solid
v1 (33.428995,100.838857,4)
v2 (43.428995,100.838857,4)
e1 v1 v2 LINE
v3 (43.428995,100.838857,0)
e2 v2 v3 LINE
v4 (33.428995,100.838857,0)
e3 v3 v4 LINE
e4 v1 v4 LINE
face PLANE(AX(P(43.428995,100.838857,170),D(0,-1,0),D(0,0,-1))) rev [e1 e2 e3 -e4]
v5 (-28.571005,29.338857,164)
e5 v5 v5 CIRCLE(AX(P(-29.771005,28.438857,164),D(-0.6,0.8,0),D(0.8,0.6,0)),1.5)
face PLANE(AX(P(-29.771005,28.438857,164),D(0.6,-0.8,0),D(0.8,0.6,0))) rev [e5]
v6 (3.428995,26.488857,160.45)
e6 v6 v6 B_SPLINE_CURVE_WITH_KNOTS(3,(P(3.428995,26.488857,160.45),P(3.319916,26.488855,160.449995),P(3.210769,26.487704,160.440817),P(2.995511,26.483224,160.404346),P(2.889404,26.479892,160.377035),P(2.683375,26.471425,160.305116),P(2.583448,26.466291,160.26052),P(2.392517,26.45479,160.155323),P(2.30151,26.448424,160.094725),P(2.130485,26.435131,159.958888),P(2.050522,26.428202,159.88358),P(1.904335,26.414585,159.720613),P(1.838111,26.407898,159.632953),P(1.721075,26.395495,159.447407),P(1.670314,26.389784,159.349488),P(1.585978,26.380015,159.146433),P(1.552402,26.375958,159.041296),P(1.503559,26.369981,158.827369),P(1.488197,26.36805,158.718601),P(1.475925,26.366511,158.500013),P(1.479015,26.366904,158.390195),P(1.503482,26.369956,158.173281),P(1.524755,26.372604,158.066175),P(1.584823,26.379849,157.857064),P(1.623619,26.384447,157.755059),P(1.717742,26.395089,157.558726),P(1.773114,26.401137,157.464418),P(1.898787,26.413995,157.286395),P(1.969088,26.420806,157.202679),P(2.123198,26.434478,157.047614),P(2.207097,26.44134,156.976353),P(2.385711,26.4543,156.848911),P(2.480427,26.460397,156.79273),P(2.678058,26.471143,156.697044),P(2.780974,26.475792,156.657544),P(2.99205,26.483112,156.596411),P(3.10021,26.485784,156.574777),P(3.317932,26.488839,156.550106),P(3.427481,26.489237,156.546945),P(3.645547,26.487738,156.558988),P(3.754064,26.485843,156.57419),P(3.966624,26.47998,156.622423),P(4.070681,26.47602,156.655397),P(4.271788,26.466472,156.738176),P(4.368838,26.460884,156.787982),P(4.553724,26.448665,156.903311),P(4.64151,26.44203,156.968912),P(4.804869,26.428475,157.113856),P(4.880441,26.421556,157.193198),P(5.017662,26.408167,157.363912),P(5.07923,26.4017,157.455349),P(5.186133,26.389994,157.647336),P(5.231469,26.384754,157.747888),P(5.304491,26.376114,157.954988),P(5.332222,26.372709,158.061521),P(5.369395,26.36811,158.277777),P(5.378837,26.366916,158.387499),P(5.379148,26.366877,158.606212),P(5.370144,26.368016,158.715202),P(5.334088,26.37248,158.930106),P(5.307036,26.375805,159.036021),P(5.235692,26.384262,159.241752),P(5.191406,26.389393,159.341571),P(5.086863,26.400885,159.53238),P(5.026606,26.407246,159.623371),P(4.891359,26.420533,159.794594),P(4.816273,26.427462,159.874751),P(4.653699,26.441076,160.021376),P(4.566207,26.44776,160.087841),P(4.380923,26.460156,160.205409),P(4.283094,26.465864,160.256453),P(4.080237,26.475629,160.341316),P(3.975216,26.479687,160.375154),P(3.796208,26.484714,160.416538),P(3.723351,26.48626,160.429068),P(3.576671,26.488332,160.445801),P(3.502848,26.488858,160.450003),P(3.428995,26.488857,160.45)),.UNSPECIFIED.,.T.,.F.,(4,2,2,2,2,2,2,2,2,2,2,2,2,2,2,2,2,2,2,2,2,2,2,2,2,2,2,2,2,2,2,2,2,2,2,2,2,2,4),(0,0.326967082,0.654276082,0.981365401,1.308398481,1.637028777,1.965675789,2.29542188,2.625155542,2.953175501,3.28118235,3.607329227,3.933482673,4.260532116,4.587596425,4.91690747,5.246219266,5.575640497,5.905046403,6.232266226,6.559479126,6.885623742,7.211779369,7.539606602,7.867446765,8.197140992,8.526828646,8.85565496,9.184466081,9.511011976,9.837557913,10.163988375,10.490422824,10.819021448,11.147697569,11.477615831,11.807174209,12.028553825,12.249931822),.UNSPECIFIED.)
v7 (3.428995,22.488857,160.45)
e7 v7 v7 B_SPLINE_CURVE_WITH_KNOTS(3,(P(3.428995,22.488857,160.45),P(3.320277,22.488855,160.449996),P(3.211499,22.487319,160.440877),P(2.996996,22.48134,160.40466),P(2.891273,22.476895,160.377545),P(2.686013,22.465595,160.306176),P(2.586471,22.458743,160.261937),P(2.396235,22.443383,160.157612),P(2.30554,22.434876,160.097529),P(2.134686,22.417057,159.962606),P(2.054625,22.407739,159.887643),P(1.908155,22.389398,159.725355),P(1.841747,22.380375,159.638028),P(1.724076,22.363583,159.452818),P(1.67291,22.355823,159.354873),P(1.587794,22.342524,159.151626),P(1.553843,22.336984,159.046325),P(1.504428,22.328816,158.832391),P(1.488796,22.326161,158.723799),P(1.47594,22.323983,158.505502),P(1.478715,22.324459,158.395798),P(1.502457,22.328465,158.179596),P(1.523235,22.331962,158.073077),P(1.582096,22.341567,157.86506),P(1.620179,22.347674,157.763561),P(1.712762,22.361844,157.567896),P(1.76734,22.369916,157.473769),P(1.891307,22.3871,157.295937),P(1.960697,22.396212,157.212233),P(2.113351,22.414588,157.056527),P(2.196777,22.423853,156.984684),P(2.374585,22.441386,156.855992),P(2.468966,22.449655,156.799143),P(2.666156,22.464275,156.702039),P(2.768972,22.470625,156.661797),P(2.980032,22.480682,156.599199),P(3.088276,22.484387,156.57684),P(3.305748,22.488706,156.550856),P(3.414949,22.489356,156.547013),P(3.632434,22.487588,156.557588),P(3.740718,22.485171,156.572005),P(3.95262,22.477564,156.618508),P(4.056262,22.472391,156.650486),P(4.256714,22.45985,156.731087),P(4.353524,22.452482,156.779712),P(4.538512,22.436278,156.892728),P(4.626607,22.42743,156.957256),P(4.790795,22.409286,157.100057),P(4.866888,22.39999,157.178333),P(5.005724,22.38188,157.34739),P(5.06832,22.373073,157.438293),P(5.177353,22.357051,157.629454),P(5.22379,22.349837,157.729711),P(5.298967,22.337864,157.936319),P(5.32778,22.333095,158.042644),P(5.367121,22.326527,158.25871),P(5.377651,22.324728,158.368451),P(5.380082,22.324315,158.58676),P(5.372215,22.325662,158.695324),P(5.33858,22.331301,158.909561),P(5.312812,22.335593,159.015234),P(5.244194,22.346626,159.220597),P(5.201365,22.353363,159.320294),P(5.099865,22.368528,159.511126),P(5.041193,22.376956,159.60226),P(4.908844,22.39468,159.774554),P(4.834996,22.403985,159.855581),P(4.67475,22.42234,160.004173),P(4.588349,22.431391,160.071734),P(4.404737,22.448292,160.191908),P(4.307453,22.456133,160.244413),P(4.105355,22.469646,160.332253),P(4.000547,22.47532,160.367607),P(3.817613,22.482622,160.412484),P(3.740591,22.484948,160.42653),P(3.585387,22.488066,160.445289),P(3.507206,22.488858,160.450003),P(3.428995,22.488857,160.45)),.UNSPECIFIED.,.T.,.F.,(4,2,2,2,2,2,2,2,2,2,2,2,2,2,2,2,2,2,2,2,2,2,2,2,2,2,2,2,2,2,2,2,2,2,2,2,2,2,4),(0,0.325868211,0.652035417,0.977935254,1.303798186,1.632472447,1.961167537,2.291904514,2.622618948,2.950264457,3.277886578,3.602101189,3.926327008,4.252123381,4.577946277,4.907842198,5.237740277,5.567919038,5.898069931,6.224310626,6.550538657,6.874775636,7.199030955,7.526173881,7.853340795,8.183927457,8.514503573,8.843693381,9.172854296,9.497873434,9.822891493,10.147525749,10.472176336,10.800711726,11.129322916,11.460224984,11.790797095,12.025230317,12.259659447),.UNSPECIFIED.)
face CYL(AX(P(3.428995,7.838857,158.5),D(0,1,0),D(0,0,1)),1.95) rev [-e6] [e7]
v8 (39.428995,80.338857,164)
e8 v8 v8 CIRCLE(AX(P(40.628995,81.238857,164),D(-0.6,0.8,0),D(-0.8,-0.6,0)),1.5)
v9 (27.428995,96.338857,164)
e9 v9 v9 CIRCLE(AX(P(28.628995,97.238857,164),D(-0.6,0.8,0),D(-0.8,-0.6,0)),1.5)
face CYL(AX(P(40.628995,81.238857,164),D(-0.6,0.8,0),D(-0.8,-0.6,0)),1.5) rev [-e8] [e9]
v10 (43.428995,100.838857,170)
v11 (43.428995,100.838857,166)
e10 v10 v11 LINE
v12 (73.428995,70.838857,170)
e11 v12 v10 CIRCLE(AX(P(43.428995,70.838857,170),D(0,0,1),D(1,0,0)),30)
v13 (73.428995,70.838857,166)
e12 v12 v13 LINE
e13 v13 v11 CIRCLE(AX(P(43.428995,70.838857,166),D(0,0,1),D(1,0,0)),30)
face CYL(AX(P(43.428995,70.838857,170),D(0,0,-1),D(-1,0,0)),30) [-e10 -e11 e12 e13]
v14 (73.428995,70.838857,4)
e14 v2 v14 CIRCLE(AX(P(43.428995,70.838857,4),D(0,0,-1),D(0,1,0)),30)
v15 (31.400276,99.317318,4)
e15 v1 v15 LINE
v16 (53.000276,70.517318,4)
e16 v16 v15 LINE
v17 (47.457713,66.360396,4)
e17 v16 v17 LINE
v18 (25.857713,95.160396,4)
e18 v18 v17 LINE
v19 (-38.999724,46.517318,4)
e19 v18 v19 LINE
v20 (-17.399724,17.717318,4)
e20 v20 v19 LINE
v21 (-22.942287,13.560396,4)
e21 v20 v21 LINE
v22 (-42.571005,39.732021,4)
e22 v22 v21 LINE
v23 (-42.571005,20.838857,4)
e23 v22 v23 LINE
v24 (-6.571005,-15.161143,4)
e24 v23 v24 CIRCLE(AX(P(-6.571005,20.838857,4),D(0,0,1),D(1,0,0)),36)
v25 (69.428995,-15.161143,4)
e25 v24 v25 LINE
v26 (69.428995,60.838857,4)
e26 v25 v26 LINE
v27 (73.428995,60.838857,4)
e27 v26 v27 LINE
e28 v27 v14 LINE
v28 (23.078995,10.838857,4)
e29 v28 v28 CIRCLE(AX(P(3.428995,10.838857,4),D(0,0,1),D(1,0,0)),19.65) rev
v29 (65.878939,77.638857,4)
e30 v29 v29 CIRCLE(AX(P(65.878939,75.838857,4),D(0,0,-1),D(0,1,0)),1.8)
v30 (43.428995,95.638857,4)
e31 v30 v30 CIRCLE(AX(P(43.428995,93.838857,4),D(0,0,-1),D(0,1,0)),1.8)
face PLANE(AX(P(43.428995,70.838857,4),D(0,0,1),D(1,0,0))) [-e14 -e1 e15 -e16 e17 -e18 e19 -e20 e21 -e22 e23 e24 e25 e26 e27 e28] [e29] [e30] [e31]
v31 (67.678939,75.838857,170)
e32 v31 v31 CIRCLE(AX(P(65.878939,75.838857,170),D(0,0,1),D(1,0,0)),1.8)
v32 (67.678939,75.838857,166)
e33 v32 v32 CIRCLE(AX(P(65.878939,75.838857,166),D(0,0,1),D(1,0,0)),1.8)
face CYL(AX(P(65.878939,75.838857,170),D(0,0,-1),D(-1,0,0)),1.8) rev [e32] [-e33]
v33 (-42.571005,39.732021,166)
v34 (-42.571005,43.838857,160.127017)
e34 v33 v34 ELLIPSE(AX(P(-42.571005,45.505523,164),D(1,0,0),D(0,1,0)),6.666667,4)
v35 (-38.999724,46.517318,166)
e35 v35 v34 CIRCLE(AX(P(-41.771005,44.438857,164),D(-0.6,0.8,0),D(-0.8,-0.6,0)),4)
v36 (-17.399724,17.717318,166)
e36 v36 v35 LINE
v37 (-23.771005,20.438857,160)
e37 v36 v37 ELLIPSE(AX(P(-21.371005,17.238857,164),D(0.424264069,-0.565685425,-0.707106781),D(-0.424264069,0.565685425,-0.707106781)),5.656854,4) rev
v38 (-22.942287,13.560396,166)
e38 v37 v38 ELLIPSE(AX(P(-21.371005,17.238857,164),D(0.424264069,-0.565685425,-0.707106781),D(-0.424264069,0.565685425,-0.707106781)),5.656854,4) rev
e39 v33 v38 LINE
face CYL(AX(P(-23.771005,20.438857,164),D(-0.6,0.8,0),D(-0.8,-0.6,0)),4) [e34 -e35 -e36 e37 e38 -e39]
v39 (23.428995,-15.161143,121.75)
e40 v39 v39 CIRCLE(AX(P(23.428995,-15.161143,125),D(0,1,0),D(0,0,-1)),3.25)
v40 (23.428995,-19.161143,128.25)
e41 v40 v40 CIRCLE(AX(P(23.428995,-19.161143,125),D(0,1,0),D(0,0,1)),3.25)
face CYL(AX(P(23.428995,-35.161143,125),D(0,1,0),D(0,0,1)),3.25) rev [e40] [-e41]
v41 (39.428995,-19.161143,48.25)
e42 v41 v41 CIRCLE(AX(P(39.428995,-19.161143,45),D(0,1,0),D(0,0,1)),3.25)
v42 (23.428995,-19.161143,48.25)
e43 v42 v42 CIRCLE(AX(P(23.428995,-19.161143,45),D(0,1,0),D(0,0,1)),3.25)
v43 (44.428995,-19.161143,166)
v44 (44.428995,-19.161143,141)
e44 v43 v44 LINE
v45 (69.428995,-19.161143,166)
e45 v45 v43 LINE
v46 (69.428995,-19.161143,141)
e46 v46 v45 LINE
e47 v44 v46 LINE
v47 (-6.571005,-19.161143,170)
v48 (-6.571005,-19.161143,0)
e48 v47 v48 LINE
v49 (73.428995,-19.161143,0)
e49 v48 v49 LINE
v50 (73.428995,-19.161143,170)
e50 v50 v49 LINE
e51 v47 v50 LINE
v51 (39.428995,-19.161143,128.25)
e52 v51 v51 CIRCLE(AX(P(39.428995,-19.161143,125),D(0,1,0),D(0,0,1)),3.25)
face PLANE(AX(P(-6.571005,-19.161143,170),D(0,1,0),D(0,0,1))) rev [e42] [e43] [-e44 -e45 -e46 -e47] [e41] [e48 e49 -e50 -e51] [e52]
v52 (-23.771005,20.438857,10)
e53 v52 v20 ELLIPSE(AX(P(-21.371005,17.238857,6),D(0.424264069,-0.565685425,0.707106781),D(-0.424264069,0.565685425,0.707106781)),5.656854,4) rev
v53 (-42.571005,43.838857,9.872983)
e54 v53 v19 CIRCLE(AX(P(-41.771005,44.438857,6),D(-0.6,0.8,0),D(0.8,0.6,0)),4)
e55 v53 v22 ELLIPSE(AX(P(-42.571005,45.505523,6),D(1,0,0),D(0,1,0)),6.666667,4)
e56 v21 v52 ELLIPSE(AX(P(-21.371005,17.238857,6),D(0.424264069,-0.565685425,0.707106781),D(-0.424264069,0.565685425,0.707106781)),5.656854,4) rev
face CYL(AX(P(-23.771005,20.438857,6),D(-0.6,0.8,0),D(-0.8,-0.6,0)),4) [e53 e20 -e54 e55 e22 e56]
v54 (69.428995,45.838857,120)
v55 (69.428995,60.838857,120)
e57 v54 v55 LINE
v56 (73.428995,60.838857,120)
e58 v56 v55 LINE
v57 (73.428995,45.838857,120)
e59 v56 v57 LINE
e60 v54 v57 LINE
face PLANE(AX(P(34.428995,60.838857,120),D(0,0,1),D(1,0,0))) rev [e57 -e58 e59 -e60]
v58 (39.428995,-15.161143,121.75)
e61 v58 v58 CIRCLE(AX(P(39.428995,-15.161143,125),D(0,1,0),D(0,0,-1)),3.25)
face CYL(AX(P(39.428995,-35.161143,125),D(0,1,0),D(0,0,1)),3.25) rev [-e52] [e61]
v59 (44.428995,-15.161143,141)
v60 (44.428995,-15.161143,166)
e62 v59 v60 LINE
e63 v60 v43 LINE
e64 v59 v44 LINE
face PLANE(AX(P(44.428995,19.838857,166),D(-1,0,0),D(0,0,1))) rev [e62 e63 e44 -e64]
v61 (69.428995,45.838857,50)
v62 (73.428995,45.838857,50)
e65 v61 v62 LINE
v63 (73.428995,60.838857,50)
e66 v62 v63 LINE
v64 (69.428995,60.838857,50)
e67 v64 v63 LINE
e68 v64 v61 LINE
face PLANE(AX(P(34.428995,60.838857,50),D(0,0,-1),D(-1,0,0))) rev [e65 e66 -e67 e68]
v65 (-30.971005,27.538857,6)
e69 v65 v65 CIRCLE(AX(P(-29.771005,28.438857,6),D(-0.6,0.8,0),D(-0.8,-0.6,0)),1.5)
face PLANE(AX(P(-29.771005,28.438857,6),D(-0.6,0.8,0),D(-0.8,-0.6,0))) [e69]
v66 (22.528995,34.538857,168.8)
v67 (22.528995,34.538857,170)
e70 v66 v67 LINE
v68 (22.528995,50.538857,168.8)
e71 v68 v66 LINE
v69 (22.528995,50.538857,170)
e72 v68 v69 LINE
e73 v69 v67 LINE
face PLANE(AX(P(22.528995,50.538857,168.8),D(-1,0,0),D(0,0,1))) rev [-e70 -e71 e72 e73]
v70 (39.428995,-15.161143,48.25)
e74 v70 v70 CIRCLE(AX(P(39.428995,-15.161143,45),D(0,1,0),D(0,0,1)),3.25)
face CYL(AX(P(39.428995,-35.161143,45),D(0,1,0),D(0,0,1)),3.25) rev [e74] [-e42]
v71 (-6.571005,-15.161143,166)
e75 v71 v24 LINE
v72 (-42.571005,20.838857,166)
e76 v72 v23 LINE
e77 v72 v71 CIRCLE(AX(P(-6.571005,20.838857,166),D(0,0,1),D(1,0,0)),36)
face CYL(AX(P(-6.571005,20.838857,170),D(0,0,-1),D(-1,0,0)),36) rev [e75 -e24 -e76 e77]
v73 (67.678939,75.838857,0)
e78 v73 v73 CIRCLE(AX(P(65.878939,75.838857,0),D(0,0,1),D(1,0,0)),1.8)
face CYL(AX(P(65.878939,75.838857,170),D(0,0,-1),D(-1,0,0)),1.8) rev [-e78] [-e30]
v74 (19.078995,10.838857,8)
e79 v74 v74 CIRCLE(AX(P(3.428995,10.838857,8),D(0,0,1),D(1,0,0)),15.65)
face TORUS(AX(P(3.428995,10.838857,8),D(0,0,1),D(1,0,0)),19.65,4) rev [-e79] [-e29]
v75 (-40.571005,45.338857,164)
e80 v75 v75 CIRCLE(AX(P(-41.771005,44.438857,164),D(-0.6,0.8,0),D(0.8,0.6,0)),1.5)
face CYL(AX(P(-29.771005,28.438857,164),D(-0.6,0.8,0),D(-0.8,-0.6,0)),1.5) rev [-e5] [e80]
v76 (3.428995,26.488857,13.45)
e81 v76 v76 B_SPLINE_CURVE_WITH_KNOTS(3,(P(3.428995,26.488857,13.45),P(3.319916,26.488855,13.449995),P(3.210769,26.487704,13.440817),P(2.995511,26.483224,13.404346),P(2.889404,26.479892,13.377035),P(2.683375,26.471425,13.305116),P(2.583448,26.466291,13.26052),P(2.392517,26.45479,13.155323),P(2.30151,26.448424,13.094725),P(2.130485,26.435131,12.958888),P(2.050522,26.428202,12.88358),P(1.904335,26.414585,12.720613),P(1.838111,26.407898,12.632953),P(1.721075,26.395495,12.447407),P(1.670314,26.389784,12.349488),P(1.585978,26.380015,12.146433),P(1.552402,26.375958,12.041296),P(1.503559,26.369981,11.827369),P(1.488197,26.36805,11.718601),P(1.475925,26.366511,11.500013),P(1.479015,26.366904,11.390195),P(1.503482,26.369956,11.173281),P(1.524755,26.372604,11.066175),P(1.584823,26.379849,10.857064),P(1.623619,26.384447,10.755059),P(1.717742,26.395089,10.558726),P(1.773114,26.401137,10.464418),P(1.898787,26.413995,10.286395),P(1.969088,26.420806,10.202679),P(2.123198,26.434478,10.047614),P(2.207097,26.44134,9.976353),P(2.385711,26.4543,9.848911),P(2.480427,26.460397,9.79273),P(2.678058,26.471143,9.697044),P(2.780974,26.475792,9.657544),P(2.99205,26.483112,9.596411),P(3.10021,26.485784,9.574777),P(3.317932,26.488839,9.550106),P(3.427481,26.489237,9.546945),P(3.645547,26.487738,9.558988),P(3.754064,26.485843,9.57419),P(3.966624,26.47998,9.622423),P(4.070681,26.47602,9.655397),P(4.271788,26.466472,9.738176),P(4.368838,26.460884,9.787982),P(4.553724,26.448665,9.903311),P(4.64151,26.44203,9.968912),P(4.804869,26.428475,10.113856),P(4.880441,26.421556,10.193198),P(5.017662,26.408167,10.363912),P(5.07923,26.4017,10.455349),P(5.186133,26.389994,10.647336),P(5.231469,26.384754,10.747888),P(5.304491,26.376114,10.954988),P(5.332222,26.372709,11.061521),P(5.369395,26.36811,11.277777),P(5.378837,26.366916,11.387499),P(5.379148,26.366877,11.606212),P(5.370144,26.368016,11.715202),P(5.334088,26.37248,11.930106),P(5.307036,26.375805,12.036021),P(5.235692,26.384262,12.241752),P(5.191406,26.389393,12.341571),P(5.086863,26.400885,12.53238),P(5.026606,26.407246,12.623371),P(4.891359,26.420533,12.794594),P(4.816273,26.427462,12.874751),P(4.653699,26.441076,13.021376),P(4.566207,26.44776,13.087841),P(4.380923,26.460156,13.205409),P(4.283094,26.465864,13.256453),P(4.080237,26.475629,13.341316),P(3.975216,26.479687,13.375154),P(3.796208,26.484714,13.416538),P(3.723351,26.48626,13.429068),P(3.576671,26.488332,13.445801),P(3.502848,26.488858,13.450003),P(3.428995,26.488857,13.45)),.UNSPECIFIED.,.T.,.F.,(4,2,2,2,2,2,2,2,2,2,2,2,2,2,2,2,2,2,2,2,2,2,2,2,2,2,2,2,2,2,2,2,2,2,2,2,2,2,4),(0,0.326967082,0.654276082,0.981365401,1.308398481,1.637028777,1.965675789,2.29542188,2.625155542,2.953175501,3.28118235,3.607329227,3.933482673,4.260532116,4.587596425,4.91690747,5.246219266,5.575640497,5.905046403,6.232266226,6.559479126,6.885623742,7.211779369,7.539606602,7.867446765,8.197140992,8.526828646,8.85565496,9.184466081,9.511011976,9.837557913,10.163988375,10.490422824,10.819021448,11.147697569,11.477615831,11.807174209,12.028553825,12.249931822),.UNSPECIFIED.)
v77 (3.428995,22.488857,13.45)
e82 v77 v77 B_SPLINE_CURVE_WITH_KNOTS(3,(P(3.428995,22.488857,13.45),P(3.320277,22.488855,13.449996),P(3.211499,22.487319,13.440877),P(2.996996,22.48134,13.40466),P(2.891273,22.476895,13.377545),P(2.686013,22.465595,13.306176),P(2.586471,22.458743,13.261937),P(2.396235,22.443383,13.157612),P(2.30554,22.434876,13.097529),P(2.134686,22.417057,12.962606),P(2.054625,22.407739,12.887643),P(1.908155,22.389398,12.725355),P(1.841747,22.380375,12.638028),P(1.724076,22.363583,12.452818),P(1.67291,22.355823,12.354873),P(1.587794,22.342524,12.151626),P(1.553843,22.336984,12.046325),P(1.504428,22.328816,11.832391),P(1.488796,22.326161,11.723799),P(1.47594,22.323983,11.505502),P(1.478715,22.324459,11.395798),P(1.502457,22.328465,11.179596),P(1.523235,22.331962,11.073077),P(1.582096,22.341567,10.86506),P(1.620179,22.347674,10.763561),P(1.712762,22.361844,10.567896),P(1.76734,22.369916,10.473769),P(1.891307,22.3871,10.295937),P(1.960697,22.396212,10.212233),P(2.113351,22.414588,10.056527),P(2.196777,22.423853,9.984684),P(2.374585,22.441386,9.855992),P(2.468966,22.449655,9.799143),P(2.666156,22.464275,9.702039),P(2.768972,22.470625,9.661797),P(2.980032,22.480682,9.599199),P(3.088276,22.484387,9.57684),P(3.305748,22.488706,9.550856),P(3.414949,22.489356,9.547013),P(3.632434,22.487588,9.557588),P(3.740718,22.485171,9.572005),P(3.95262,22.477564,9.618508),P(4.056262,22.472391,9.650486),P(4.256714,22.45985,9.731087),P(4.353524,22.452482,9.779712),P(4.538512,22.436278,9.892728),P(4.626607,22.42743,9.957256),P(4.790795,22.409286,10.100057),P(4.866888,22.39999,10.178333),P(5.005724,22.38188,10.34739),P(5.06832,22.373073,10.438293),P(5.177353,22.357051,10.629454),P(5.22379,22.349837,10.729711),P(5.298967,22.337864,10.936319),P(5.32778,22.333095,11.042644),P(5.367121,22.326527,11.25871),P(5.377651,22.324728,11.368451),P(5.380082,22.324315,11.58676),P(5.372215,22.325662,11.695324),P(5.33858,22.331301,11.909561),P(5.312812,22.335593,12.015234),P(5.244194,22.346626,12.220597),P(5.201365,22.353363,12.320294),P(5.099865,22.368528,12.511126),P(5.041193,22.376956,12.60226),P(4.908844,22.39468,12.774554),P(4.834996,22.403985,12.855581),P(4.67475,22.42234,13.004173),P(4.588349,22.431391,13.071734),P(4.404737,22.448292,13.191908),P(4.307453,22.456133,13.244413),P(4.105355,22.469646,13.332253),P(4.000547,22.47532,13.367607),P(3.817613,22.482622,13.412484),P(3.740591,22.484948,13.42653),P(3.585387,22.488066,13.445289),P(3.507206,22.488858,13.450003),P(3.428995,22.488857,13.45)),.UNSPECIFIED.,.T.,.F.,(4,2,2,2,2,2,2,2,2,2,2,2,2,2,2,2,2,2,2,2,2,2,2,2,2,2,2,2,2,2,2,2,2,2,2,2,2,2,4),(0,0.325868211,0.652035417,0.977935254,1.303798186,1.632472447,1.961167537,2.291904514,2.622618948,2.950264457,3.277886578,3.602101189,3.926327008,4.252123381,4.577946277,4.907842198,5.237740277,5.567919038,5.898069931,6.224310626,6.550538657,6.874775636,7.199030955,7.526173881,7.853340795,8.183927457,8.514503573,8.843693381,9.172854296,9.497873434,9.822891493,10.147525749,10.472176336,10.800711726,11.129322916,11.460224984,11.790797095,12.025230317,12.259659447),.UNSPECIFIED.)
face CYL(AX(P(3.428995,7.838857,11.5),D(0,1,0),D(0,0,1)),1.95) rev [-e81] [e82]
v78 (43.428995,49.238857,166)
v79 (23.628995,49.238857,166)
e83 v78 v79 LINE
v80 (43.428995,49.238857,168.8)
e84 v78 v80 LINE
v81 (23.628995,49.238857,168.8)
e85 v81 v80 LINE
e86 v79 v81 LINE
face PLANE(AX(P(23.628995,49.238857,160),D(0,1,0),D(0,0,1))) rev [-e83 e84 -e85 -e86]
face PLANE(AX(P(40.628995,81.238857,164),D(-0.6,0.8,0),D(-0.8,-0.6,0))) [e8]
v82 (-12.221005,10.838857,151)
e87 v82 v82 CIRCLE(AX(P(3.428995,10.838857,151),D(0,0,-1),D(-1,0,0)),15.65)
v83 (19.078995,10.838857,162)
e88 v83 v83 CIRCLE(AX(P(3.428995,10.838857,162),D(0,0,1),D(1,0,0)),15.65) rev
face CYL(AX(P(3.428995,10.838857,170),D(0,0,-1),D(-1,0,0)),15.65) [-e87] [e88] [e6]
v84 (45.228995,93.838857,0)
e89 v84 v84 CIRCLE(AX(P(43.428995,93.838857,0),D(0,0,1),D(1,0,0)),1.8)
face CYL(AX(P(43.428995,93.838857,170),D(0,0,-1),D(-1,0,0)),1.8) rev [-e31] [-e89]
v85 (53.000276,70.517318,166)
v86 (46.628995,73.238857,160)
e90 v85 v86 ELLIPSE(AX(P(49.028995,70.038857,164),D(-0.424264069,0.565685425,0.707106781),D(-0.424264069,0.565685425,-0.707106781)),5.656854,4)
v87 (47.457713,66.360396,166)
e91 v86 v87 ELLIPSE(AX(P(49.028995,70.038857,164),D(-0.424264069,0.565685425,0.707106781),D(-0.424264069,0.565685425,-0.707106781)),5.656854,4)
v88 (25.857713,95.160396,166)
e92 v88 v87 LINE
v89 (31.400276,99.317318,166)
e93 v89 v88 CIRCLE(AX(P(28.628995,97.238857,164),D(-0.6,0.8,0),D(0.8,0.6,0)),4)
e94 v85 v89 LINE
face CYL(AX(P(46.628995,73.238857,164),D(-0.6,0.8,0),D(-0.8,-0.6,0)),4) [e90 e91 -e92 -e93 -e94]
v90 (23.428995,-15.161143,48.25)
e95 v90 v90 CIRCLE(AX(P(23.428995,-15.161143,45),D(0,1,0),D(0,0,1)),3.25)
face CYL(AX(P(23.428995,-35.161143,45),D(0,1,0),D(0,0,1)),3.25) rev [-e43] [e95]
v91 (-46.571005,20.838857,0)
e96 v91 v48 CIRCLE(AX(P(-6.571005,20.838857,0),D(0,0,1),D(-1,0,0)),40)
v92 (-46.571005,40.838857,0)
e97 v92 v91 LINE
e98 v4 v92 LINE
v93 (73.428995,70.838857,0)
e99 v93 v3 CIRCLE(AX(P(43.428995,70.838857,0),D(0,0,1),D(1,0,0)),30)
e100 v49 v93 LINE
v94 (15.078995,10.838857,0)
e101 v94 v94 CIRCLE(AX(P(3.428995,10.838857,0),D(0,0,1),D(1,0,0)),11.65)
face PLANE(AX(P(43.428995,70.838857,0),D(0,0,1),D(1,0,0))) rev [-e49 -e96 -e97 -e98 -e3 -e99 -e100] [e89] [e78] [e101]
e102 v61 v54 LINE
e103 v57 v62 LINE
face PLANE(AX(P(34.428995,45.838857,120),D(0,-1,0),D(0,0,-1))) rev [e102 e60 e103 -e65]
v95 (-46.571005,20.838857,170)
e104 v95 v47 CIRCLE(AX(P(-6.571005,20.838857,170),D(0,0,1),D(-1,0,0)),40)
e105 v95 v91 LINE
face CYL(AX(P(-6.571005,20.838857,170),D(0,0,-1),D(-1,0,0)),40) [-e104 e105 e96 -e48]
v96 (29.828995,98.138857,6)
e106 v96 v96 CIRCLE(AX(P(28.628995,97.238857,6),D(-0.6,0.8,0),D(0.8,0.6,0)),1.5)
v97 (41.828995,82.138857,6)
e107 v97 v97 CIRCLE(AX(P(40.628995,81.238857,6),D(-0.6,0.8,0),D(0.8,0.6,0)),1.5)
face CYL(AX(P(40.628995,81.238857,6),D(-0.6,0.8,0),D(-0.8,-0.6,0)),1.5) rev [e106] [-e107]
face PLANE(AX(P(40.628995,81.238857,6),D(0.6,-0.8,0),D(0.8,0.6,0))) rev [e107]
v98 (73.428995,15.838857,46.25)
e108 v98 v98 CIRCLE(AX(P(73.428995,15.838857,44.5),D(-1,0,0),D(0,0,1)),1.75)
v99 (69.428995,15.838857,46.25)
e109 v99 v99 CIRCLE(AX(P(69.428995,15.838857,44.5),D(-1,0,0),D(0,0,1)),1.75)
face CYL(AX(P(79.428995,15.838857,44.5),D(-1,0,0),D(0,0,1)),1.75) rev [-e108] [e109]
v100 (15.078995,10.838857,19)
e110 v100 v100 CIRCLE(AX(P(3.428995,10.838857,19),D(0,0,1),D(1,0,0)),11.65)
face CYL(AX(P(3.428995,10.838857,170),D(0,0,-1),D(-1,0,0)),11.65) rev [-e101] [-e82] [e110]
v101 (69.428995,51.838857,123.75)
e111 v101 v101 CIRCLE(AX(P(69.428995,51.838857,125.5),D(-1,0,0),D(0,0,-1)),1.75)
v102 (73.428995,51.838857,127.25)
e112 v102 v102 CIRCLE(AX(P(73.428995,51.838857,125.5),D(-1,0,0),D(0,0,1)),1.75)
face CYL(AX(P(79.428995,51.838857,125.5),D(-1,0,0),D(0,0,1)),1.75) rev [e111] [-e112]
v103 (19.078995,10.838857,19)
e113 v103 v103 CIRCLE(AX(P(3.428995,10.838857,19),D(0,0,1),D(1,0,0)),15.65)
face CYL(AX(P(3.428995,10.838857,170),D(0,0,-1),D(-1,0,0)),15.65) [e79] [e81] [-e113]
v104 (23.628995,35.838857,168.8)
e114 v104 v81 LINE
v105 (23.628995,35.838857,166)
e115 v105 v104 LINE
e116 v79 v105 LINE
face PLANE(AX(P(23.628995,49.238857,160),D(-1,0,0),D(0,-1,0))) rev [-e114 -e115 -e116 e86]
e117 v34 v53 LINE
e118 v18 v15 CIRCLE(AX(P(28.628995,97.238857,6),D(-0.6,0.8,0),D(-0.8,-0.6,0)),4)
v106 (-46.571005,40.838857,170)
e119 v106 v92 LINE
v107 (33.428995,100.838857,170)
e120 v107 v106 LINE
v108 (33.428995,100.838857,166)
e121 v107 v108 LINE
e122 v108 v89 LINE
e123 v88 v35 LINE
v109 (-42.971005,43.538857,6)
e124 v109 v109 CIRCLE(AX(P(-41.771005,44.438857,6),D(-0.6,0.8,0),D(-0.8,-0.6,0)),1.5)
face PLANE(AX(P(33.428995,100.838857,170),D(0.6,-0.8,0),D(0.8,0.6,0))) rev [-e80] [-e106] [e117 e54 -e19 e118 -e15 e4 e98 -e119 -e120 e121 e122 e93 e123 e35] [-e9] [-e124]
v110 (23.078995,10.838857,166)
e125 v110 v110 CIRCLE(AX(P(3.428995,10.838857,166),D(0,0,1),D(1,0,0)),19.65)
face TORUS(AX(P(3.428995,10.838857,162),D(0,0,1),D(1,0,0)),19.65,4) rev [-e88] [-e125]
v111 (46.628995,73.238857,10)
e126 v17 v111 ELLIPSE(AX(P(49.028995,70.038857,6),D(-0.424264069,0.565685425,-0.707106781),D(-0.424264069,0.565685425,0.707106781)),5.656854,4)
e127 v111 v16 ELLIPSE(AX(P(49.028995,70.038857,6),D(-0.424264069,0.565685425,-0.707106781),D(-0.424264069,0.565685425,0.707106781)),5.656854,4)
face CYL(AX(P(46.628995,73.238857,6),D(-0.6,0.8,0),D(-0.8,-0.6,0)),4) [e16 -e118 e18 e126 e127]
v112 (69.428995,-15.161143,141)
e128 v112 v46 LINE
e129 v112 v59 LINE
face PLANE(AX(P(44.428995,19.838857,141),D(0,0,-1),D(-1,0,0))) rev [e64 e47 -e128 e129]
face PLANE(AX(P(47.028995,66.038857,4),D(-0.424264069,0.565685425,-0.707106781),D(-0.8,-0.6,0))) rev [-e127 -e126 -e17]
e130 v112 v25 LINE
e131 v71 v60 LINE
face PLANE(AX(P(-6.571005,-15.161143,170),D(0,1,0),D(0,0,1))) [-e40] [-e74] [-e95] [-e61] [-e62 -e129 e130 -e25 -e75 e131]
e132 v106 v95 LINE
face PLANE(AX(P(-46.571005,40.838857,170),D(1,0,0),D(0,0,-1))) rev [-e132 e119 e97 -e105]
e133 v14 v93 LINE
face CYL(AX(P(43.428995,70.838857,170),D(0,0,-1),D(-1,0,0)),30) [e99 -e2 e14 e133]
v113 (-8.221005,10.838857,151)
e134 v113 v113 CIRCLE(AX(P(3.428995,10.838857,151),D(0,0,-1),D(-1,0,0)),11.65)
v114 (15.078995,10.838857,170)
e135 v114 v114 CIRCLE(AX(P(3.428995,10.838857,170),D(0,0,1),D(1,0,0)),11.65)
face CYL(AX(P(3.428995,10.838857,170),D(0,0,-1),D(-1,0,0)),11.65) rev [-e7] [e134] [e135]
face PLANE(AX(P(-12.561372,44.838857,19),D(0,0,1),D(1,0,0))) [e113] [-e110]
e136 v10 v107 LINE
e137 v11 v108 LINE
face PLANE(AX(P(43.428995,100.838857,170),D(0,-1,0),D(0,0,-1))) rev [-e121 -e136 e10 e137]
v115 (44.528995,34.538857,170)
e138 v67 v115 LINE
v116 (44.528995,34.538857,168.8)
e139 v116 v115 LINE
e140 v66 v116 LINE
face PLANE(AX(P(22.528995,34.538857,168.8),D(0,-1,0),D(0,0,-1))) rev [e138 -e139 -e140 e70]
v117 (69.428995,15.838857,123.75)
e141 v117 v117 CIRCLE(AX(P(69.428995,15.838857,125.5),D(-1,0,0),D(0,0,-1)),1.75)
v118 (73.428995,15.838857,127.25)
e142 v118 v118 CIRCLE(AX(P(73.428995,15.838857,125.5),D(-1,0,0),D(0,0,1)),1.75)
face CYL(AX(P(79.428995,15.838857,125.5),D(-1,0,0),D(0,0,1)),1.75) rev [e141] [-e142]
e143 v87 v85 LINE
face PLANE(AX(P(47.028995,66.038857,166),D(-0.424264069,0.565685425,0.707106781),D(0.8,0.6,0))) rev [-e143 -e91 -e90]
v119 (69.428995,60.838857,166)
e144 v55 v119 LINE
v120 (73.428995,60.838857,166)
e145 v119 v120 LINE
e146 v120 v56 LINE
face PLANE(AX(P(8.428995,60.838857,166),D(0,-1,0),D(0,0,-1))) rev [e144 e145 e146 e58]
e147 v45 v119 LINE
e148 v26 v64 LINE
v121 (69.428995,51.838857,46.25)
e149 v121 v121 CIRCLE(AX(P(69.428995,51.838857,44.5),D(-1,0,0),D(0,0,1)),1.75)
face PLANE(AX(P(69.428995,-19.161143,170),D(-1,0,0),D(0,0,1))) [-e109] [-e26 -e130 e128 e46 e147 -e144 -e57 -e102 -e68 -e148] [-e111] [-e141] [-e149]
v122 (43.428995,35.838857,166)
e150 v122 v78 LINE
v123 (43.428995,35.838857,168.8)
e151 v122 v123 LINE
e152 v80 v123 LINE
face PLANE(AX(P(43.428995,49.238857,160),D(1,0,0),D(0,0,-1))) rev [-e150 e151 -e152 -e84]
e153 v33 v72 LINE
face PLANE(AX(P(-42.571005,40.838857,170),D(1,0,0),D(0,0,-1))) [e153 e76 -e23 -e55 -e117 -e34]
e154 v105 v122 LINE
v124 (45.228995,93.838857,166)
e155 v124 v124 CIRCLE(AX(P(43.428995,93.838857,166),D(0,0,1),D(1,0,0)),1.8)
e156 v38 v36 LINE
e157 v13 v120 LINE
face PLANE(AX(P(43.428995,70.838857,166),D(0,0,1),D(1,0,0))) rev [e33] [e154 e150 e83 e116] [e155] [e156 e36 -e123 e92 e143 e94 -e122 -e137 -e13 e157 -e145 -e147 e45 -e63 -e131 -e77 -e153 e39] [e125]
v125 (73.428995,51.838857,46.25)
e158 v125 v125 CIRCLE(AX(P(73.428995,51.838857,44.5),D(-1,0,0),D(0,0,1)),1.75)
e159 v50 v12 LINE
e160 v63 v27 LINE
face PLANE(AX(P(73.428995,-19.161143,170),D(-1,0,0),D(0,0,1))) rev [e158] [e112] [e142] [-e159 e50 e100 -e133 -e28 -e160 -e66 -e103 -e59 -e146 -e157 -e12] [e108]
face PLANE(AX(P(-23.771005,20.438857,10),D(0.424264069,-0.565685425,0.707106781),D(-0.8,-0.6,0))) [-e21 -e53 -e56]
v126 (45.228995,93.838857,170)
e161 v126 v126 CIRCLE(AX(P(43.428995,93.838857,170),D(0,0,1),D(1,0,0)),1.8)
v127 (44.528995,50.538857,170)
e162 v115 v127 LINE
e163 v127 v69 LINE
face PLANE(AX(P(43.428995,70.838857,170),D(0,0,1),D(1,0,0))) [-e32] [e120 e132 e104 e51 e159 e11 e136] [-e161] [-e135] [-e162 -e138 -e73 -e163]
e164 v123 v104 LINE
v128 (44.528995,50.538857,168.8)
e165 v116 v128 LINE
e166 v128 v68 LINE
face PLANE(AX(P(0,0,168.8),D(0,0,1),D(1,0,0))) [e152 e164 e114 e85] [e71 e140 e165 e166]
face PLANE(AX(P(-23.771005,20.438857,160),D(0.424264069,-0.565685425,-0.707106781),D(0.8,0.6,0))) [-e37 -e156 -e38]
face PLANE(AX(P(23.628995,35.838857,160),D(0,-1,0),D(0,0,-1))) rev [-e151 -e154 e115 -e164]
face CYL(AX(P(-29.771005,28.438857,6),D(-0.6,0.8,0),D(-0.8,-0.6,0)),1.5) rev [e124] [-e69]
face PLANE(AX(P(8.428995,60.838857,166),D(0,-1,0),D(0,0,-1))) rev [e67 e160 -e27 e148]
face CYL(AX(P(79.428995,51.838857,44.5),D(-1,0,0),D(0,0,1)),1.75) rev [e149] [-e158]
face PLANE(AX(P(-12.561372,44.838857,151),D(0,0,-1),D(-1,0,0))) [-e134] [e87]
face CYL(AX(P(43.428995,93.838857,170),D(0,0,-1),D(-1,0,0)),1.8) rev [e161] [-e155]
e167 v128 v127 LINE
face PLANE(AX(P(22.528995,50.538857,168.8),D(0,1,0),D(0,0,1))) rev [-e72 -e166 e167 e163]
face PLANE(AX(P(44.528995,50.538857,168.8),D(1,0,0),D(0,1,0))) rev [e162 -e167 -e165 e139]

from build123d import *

# Parameters (mm, degrees)
SKETCH_1_R           = 11.65
SKETCH_1_R_2         = 1.8
EXTRUDE_1_DEPTH      = 170
SHELL_2_T            = -4
SKETCH_10_W          = 162
SKETCH_10_H          = 68.975267516
CUT_EXTRUDE_8_DEPTH  = 65
SKETCH_2_R           = 4
EXTRUDE_2_DEPTH      = 30
SKETCH_3_W           = 48.76473187
SKETCH_3_H           = 132
CUT_EXTRUDE_1_DEPTH  = 57
SKETCH_4_R           = 1.5
CUT_EXTRUDE_2_DEPTH  = 20
SKETCH_5_R           = 3.25
CUT_EXTRUDE_3_DEPTH  = 20
SKETCH_6_R           = 1.95
CUT_EXTRUDE_4_DEPTH  = 93
FILLET_1_R           = 4
CHAMFER_2_SIZE       = 6
SKETCH_7_W           = 70
SKETCH_7_H           = 15
CUT_EXTRUDE_5_DEPTH  = 39
SKETCH_9_W           = 25
SKETCH_9_H           = 25
CUT_EXTRUDE_7_DEPTH  = 39
SKETCH_11_R          = 1.75
CUT_EXTRUDE_9_DEPTH  = 10
SKETCH_8_W           = 19.8
SKETCH_8_H           = 13.4
CUT_EXTRUDE_10_DEPTH = 10
SKETCH_12_W          = 22
SKETCH_12_H          = 16
CUT_EXTRUDE_11_DEPTH = 1.2


with BuildPart() as part:
    # 草图1 → 凸台-拉伸1 (new body)
    with BuildSketch(Plane.XY):
        with BuildLine():
            Line((-6.571005291, -19.16114319), (73.428994709, -19.16114319))
            Line((73.428994709, -19.16114319), (73.428994709, 70.83885681))
            ThreePointArc((73.428994709, 70.83885681), (64.642198145, 92.052060245), (43.428994709, 100.83885681))
            Line((43.428994709, 100.83885681), (33.428994709, 100.83885681))
            Line((33.428994709, 100.83885681), (-46.571005291, 40.83885681))
            Line((-46.571005291, 40.83885681), (-46.571005291, 20.83885681))
            ThreePointArc((-46.571005291, 20.83885681), (-34.855276538, -7.445414438), (-6.571005291, -19.16114319))
        make_face()
        with Locations((3.428994709, 10.83885681)):
            Circle(SKETCH_1_R, mode=Mode.SUBTRACT)
        with Locations((43.428994709, 93.83885681)):
            Circle(SKETCH_1_R_2, mode=Mode.SUBTRACT)
        with Locations((65.87893903, 75.83885681)):
            Circle(SKETCH_1_R_2, mode=Mode.SUBTRACT)
    extrude(amount=EXTRUDE_1_DEPTH)

    # 抽壳2
    shell_2_openings = [part.faces().sort_by_distance(p)[0] for p in [
        (-6.571005291, 70.83885681, 85),
    ]]
    offset(amount=SHELL_2_T, openings=shell_2_openings)

    # 草图10 → 切除-拉伸8 (cut)
    with BuildSketch(Plane(origin=(73.428994709, 0, 0), x_dir=(0, 0, -1), z_dir=(1, 0, 0))):
        with Locations((-85, 95.326490568)):
            Rectangle(SKETCH_10_W, SKETCH_10_H)
    extrude(amount=-CUT_EXTRUDE_8_DEPTH, mode=Mode.SUBTRACT)

    # 草图2 → 凸台-拉伸2 (add)
    with BuildSketch(Plane(origin=(-36.368213173, 48.490950898, 0), x_dir=(0.8000000000000002, 0.6, 0), z_dir=(-0.6, 0.8000000000000002, 0))):
        with Locations((81.246509853, -6)):
            Circle(SKETCH_2_R)
        with Locations((-6.753490147, -6)):
            Circle(SKETCH_2_R)
        with Locations((81.246509853, -164)):
            Circle(SKETCH_2_R)
        with Locations((-6.753490147, -164)):
            Circle(SKETCH_2_R)
    extrude(amount=-EXTRUDE_2_DEPTH)

    # 草图3 → 切除-拉伸1 (cut)
    with BuildSketch(Plane(origin=(0, -12.16114319, 0), x_dir=(1, 0, 0), z_dir=(0, 1, 0))):
        with Locations((11.820994157, -85)):
            Rectangle(SKETCH_3_W, SKETCH_3_H)
    extrude(amount=CUT_EXTRUDE_1_DEPTH, mode=Mode.SUBTRACT)

    # 草图4 → 切除-拉伸2 (cut)
    with BuildSketch(Plane(origin=(-36.368213173, 48.490950898, 0), x_dir=(0.8000000000000002, 0.6, 0), z_dir=(-0.6, 0.8000000000000002, 0))):
        with Locations(Location((-6.753490147, -6, 0), (0, 0, 180))):
            Circle(SKETCH_4_R)
        with Locations((81.246509853, -6)):
            Circle(SKETCH_4_R)
        with Locations(Location((81.246509853, -164, 0), (0, 0, 180))):
            Circle(SKETCH_4_R)
        with Locations((-6.753490147, -164)):
            Circle(SKETCH_4_R)
    extrude(amount=-CUT_EXTRUDE_2_DEPTH, mode=Mode.SUBTRACT)

    # 草图5 → 切除-拉伸3 (cut)
    with BuildSketch(Plane(origin=(0, -15.16114319, 0), x_dir=(1, 0, 0), z_dir=(0, 1, 0))):
        with Locations(Location((23.428994709, -45, 0), (0, 0, 270))):
            Circle(SKETCH_5_R)
        with Locations(Location((39.428994709, -45, 0), (0, 0, 270))):
            Circle(SKETCH_5_R)
        with Locations(Location((23.428994709, -125, 0), (0, 0, 270))):
            Circle(SKETCH_5_R)
        with Locations(Location((39.428994709, -125, 0), (0, 0, 270))):
            Circle(SKETCH_5_R)
    extrude(amount=-CUT_EXTRUDE_3_DEPTH, mode=Mode.SUBTRACT)

    # 草图6 → 切除-拉伸4 (cut)
    with BuildSketch(Plane(origin=(0, 100.83885681, 0), x_dir=(1, 0, 0), z_dir=(0, 1, 0))):
        with Locations(Location((3.428994709, -158.5, 0), (0, 0, 270))):
            Circle(SKETCH_6_R)
        with Locations(Location((3.428994709, -11.5, 0), (0, 0, 270))):
            Circle(SKETCH_6_R)
    extrude(amount=-CUT_EXTRUDE_4_DEPTH, mode=Mode.SUBTRACT)

    # 圆角1
    fillet_1_edges = [part.edges().sort_by_distance(p)[0] for p in [
        (-12.221005291, 10.83885681, 4),
        (-12.221005291, 10.83885681, 166),
    ]]
    fillet(fillet_1_edges, radius=FILLET_1_R)

    # Chamfer 2
    chamfer_2_edges = [part.edges().sort_by_distance(p)[0] for p in [
        (-23.771005291, 20.43885681, 4),
        (46.628994709, 73.23885681, 4),
        (46.628994709, 73.23885681, 166),
        (-23.771005291, 20.43885681, 166),
    ]]
    chamfer(chamfer_2_edges, length=CHAMFER_2_SIZE - 0.0001)  # a hair under: the kernel refuses the full size

    # 草图7 → 切除-拉伸5 (cut)
    with BuildSketch(Plane(origin=(73.428994709, 0, 0), x_dir=(0, 0, -1), z_dir=(1, 0, 0))):
        with Locations((-85, 53.33885681)):
            Rectangle(SKETCH_7_W, SKETCH_7_H)
    extrude(amount=-CUT_EXTRUDE_5_DEPTH, mode=Mode.SUBTRACT)

    # 草图9 → 切除-拉伸7 (cut)
    with BuildSketch(Plane.XZ.offset(19.16114319)):
        with Locations((56.928994709, 153.5)):
            Rectangle(SKETCH_9_W, SKETCH_9_H)
    extrude(amount=-CUT_EXTRUDE_7_DEPTH, mode=Mode.SUBTRACT)

    # 草图11 → 切除-拉伸9 (cut)
    with BuildSketch(Plane.ZY.offset(-69.428994709)):
        with Locations((44.5, 51.83885681)):
            Circle(SKETCH_11_R)
        with Locations((44.5, 15.83885681)):
            Circle(SKETCH_11_R)
        with Locations((125.5, 15.83885681)):
            Circle(SKETCH_11_R)
        with Locations((125.5, 51.83885681)):
            Circle(SKETCH_11_R)
    extrude(amount=-CUT_EXTRUDE_9_DEPTH, mode=Mode.SUBTRACT)

    # 草图8 → 切除-拉伸10 (cut)
    with BuildSketch(Plane.XY.offset(170)):
        with Locations((33.528994709, 42.53885681)):
            Rectangle(SKETCH_8_W, SKETCH_8_H)
    extrude(amount=-CUT_EXTRUDE_10_DEPTH, mode=Mode.SUBTRACT)

    # 草图12 → 切除-拉伸11 (cut)
    with BuildSketch(Plane.XY.offset(170)):
        with Locations((33.528994709, 42.53885681)):
            Rectangle(SKETCH_12_W, SKETCH_12_H)
    extrude(amount=-CUT_EXTRUDE_11_DEPTH, mode=Mode.SUBTRACT)


solid = part.part
